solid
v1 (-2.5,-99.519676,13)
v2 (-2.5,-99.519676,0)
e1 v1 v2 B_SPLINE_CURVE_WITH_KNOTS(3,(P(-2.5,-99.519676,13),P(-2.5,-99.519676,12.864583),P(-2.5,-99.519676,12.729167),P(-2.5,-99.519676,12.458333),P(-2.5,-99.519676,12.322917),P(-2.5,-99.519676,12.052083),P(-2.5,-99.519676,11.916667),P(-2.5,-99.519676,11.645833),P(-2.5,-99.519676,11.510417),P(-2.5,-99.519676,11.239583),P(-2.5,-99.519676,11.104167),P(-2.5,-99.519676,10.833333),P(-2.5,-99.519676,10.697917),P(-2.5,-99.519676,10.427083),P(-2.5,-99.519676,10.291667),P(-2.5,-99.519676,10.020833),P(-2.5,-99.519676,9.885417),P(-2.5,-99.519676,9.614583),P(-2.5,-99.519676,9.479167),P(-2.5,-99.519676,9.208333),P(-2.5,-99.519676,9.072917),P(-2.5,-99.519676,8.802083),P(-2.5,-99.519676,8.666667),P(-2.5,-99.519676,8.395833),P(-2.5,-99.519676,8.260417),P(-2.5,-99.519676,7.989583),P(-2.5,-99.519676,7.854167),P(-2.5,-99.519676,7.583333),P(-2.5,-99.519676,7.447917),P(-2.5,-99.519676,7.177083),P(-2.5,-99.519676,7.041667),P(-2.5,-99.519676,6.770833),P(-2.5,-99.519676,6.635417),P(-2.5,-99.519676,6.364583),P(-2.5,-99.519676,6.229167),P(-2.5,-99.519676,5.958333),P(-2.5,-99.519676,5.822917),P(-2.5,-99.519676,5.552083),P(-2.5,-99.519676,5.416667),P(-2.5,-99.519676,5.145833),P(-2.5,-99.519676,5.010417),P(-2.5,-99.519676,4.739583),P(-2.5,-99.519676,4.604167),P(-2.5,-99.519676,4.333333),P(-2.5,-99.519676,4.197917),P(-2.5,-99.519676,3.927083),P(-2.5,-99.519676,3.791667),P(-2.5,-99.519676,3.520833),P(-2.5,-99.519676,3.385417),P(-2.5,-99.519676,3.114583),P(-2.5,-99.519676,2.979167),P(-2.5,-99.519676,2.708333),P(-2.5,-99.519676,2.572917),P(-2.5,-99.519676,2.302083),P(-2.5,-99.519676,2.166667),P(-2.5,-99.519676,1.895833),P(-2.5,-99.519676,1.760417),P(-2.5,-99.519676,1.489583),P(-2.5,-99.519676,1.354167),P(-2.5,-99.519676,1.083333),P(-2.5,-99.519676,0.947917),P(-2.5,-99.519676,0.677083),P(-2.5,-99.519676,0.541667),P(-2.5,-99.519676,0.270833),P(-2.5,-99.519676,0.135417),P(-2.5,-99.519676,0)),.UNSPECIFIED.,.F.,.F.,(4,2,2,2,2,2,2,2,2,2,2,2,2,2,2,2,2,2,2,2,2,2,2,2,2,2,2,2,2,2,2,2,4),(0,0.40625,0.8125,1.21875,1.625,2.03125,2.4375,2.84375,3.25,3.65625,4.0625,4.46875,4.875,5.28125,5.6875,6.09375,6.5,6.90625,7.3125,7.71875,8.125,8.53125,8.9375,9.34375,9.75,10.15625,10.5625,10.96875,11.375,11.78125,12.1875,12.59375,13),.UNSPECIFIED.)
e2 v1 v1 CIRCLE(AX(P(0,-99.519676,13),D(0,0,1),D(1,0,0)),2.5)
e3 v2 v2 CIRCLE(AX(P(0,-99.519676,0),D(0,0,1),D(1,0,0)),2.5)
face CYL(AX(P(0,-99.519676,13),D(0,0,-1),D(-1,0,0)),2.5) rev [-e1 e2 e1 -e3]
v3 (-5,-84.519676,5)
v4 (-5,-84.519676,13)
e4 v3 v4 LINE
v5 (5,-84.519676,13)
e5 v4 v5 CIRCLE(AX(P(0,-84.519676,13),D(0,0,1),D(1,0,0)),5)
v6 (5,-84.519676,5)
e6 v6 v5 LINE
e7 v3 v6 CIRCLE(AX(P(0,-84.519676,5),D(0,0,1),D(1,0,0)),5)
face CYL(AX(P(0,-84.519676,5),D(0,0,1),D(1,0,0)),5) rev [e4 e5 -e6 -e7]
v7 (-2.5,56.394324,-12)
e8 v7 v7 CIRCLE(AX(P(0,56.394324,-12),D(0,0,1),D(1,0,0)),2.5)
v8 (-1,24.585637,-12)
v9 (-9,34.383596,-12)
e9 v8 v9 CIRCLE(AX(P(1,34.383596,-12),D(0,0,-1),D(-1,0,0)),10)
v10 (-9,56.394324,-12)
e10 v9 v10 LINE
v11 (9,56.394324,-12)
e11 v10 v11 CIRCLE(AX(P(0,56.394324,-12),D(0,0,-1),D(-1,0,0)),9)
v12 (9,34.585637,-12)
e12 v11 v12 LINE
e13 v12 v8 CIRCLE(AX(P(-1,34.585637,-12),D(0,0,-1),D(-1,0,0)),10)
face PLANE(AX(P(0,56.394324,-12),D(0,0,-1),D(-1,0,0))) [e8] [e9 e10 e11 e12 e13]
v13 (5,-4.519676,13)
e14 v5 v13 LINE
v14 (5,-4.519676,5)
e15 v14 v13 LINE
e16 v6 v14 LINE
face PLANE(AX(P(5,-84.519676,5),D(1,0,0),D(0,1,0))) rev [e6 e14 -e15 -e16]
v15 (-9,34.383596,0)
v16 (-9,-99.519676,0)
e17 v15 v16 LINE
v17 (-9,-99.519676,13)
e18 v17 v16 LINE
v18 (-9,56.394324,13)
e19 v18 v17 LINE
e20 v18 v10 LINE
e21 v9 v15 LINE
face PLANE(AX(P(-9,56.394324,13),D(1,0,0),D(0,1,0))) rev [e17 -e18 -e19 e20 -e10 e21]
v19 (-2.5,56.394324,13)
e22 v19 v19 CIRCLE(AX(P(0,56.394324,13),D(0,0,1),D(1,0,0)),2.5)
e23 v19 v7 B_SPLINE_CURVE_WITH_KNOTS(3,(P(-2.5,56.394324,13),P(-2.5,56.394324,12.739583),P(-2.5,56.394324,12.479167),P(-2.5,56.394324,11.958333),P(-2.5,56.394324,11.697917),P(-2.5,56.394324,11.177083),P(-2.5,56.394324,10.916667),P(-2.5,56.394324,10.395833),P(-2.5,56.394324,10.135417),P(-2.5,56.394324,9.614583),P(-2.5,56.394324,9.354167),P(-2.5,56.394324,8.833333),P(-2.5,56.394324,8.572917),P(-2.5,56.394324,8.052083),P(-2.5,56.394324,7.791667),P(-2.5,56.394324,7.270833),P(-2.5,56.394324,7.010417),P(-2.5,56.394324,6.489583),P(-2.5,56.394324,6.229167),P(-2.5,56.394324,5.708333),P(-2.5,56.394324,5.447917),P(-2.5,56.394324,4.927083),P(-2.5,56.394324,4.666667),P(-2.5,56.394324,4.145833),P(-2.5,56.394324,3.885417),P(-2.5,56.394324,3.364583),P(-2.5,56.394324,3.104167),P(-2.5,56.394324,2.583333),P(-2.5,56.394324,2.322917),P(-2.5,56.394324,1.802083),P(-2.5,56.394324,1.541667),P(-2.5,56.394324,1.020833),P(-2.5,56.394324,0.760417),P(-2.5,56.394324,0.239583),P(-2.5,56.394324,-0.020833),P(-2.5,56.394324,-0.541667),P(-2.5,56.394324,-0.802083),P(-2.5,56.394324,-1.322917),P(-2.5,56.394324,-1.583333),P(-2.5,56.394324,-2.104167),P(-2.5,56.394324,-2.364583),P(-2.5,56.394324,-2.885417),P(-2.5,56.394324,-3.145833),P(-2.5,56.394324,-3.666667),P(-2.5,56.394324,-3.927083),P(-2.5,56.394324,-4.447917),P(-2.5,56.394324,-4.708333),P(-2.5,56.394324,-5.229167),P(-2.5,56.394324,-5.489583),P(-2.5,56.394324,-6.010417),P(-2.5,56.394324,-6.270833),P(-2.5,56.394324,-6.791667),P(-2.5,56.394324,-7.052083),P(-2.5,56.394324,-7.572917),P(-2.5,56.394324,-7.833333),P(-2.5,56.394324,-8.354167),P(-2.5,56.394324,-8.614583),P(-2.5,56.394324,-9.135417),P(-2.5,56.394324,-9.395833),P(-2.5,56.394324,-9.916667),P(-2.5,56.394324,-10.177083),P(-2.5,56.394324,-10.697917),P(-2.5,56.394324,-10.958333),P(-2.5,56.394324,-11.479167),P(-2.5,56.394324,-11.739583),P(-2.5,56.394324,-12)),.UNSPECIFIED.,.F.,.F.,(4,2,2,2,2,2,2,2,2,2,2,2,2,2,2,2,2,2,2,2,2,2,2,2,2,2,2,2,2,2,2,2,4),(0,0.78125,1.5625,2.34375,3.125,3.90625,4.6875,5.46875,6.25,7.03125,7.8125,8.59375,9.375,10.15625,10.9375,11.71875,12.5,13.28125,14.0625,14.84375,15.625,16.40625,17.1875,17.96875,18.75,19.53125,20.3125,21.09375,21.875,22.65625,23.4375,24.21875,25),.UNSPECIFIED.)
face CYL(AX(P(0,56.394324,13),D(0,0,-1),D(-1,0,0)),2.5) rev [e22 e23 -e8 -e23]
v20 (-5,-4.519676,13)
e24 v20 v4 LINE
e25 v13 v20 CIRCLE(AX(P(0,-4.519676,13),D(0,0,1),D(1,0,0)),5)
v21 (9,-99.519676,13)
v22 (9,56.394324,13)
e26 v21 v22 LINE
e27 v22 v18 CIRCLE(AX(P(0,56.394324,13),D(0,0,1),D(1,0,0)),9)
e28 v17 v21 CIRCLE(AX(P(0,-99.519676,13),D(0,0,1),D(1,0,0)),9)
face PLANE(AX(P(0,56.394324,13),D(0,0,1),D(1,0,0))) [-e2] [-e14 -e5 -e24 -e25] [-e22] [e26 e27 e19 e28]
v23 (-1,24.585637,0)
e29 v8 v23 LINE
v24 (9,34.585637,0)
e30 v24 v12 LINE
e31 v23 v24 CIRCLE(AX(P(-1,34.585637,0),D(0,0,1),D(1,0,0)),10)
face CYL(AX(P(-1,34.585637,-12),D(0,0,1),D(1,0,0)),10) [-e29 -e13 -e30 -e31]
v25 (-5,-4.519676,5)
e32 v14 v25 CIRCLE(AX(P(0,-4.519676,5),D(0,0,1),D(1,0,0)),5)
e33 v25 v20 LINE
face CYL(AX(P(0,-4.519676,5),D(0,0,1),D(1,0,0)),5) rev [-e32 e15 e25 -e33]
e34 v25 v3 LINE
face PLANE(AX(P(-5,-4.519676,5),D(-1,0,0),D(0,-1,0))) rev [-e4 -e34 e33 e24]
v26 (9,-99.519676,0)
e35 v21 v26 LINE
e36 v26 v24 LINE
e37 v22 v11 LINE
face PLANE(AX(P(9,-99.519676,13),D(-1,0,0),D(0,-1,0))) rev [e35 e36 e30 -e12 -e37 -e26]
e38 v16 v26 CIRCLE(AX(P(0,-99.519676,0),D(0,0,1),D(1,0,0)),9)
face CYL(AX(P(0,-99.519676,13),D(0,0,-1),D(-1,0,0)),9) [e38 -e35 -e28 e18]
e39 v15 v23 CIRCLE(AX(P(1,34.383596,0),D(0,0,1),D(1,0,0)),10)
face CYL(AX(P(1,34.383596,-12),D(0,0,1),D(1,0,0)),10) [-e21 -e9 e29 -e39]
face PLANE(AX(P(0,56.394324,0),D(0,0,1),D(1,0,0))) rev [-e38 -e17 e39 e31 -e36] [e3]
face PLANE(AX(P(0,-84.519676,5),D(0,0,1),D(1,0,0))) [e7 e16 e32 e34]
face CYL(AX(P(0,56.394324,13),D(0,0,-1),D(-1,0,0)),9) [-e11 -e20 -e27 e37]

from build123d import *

# Parameters (mm, degrees)
SKETCH1_R      = 2.5
EXTRUDE1_DEPTH = 13
EXTRUDE2_DEPTH = 8
EXTRUDE3_START = 12
EXTRUDE3_DEPTH = 12
FILLET1_R      = 10
FILLET2_R      = 10
SKETCH4_R      = 2.5
EXTRUDE4_DEPTH = 112.725198761


with BuildPart() as part:
    # Sketch1 → Extrude1 (new body)
    with BuildSketch(Plane.XY):
        with BuildLine():
            Line((-9, 56.394324189), (-9, -99.519675811))
            ThreePointArc((-9, -99.519675811), (0, -108.519675811), (9, -99.519675811))
            Line((9, -99.519675811), (9, 56.394324189))
            ThreePointArc((9, 56.394324189), (0, 65.394324189), (-9, 56.394324189))
        make_face()
        with Locations(Location((0, 56.394324189, 0), (0, 0, 180))):
            Circle(SKETCH1_R, mode=Mode.SUBTRACT)
        with Locations(Location((0, -99.519675811, 0), (0, 0, 180))):
            Circle(SKETCH1_R, mode=Mode.SUBTRACT)
    extrude(amount=EXTRUDE1_DEPTH)

    # Sketch2 → Extrude2 (cut)
    with BuildSketch(Plane.XY.offset(13)):
        with BuildLine():
            Line((-5, -4.519675811), (-5, -84.519675811))
            ThreePointArc((-5, -84.519675811), (0, -89.519675811), (5, -84.519675811))
            Line((5, -84.519675811), (5, -4.519675811))
            ThreePointArc((5, -4.519675811), (0, 0.480324189), (-5, -4.519675811))
        make_face()
    extrude(amount=-EXTRUDE2_DEPTH, mode=Mode.SUBTRACT)

    # Sketch3 → Extrude3 (add)
    with BuildSketch(Plane(origin=(0, 0, 0), x_dir=(-1, 0, 0), z_dir=(0, 0, -1)).offset(EXTRUDE3_START)):
        with BuildLine():
            Line((-9, 56.394324189), (-9, 24.585637313))
            Line((-9, 24.585637313), (9, 24.585637313))
            Line((9, 24.585637313), (9, 56.394324189))
            ThreePointArc((9, 56.394324189), (0, 65.394324189), (-9, 56.394324189))
        make_face()
    extrude(amount=-EXTRUDE3_DEPTH)

    # Fillet1
    fillet1_edges = [part.edges().sort_by_distance(p)[0] for p in [
        (9, 24.585637313, -6),
    ]]
    fillet(fillet1_edges, radius=FILLET1_R)

    # Fillet2
    # the kernel refuses this fillet: 10 mm, written as the material it takes off along each edge
    with BuildSketch(Plane(origin=(-9, 24.585637313, -36.494897428), x_dir=(0, 1, 0), z_dir=(0, 0, 1))) as fillet2_piece_1:
        with BuildLine():
            CenterArc((9.797958971, -10), FILLET2_R, 90, 78.463040967)
            Line((0, -8), (-0.195959179, -7.96))
            ThreePointArc((-0.195959179, -7.96), (-0.2, -4), (-0.2, 0))
            Line((-0.2, 0), (0, 0.2))
            Line((0, 0.2), (9.797958971, 0.2))
            Line((9.797958971, 0.2), (9.797958971, 0))
        make_face()
    extrude(amount=36.494897428, mode=Mode.SUBTRACT)

    # Sketch4 → Extrude4 (cut, through all)
    with BuildSketch(Plane.XY.offset(13)):
        with Locations(Location((0, 56.394324189, 0), (0, 0, 180))):
            Circle(SKETCH4_R)
    extrude(amount=-EXTRUDE4_DEPTH, mode=Mode.SUBTRACT)


solid = part.part
